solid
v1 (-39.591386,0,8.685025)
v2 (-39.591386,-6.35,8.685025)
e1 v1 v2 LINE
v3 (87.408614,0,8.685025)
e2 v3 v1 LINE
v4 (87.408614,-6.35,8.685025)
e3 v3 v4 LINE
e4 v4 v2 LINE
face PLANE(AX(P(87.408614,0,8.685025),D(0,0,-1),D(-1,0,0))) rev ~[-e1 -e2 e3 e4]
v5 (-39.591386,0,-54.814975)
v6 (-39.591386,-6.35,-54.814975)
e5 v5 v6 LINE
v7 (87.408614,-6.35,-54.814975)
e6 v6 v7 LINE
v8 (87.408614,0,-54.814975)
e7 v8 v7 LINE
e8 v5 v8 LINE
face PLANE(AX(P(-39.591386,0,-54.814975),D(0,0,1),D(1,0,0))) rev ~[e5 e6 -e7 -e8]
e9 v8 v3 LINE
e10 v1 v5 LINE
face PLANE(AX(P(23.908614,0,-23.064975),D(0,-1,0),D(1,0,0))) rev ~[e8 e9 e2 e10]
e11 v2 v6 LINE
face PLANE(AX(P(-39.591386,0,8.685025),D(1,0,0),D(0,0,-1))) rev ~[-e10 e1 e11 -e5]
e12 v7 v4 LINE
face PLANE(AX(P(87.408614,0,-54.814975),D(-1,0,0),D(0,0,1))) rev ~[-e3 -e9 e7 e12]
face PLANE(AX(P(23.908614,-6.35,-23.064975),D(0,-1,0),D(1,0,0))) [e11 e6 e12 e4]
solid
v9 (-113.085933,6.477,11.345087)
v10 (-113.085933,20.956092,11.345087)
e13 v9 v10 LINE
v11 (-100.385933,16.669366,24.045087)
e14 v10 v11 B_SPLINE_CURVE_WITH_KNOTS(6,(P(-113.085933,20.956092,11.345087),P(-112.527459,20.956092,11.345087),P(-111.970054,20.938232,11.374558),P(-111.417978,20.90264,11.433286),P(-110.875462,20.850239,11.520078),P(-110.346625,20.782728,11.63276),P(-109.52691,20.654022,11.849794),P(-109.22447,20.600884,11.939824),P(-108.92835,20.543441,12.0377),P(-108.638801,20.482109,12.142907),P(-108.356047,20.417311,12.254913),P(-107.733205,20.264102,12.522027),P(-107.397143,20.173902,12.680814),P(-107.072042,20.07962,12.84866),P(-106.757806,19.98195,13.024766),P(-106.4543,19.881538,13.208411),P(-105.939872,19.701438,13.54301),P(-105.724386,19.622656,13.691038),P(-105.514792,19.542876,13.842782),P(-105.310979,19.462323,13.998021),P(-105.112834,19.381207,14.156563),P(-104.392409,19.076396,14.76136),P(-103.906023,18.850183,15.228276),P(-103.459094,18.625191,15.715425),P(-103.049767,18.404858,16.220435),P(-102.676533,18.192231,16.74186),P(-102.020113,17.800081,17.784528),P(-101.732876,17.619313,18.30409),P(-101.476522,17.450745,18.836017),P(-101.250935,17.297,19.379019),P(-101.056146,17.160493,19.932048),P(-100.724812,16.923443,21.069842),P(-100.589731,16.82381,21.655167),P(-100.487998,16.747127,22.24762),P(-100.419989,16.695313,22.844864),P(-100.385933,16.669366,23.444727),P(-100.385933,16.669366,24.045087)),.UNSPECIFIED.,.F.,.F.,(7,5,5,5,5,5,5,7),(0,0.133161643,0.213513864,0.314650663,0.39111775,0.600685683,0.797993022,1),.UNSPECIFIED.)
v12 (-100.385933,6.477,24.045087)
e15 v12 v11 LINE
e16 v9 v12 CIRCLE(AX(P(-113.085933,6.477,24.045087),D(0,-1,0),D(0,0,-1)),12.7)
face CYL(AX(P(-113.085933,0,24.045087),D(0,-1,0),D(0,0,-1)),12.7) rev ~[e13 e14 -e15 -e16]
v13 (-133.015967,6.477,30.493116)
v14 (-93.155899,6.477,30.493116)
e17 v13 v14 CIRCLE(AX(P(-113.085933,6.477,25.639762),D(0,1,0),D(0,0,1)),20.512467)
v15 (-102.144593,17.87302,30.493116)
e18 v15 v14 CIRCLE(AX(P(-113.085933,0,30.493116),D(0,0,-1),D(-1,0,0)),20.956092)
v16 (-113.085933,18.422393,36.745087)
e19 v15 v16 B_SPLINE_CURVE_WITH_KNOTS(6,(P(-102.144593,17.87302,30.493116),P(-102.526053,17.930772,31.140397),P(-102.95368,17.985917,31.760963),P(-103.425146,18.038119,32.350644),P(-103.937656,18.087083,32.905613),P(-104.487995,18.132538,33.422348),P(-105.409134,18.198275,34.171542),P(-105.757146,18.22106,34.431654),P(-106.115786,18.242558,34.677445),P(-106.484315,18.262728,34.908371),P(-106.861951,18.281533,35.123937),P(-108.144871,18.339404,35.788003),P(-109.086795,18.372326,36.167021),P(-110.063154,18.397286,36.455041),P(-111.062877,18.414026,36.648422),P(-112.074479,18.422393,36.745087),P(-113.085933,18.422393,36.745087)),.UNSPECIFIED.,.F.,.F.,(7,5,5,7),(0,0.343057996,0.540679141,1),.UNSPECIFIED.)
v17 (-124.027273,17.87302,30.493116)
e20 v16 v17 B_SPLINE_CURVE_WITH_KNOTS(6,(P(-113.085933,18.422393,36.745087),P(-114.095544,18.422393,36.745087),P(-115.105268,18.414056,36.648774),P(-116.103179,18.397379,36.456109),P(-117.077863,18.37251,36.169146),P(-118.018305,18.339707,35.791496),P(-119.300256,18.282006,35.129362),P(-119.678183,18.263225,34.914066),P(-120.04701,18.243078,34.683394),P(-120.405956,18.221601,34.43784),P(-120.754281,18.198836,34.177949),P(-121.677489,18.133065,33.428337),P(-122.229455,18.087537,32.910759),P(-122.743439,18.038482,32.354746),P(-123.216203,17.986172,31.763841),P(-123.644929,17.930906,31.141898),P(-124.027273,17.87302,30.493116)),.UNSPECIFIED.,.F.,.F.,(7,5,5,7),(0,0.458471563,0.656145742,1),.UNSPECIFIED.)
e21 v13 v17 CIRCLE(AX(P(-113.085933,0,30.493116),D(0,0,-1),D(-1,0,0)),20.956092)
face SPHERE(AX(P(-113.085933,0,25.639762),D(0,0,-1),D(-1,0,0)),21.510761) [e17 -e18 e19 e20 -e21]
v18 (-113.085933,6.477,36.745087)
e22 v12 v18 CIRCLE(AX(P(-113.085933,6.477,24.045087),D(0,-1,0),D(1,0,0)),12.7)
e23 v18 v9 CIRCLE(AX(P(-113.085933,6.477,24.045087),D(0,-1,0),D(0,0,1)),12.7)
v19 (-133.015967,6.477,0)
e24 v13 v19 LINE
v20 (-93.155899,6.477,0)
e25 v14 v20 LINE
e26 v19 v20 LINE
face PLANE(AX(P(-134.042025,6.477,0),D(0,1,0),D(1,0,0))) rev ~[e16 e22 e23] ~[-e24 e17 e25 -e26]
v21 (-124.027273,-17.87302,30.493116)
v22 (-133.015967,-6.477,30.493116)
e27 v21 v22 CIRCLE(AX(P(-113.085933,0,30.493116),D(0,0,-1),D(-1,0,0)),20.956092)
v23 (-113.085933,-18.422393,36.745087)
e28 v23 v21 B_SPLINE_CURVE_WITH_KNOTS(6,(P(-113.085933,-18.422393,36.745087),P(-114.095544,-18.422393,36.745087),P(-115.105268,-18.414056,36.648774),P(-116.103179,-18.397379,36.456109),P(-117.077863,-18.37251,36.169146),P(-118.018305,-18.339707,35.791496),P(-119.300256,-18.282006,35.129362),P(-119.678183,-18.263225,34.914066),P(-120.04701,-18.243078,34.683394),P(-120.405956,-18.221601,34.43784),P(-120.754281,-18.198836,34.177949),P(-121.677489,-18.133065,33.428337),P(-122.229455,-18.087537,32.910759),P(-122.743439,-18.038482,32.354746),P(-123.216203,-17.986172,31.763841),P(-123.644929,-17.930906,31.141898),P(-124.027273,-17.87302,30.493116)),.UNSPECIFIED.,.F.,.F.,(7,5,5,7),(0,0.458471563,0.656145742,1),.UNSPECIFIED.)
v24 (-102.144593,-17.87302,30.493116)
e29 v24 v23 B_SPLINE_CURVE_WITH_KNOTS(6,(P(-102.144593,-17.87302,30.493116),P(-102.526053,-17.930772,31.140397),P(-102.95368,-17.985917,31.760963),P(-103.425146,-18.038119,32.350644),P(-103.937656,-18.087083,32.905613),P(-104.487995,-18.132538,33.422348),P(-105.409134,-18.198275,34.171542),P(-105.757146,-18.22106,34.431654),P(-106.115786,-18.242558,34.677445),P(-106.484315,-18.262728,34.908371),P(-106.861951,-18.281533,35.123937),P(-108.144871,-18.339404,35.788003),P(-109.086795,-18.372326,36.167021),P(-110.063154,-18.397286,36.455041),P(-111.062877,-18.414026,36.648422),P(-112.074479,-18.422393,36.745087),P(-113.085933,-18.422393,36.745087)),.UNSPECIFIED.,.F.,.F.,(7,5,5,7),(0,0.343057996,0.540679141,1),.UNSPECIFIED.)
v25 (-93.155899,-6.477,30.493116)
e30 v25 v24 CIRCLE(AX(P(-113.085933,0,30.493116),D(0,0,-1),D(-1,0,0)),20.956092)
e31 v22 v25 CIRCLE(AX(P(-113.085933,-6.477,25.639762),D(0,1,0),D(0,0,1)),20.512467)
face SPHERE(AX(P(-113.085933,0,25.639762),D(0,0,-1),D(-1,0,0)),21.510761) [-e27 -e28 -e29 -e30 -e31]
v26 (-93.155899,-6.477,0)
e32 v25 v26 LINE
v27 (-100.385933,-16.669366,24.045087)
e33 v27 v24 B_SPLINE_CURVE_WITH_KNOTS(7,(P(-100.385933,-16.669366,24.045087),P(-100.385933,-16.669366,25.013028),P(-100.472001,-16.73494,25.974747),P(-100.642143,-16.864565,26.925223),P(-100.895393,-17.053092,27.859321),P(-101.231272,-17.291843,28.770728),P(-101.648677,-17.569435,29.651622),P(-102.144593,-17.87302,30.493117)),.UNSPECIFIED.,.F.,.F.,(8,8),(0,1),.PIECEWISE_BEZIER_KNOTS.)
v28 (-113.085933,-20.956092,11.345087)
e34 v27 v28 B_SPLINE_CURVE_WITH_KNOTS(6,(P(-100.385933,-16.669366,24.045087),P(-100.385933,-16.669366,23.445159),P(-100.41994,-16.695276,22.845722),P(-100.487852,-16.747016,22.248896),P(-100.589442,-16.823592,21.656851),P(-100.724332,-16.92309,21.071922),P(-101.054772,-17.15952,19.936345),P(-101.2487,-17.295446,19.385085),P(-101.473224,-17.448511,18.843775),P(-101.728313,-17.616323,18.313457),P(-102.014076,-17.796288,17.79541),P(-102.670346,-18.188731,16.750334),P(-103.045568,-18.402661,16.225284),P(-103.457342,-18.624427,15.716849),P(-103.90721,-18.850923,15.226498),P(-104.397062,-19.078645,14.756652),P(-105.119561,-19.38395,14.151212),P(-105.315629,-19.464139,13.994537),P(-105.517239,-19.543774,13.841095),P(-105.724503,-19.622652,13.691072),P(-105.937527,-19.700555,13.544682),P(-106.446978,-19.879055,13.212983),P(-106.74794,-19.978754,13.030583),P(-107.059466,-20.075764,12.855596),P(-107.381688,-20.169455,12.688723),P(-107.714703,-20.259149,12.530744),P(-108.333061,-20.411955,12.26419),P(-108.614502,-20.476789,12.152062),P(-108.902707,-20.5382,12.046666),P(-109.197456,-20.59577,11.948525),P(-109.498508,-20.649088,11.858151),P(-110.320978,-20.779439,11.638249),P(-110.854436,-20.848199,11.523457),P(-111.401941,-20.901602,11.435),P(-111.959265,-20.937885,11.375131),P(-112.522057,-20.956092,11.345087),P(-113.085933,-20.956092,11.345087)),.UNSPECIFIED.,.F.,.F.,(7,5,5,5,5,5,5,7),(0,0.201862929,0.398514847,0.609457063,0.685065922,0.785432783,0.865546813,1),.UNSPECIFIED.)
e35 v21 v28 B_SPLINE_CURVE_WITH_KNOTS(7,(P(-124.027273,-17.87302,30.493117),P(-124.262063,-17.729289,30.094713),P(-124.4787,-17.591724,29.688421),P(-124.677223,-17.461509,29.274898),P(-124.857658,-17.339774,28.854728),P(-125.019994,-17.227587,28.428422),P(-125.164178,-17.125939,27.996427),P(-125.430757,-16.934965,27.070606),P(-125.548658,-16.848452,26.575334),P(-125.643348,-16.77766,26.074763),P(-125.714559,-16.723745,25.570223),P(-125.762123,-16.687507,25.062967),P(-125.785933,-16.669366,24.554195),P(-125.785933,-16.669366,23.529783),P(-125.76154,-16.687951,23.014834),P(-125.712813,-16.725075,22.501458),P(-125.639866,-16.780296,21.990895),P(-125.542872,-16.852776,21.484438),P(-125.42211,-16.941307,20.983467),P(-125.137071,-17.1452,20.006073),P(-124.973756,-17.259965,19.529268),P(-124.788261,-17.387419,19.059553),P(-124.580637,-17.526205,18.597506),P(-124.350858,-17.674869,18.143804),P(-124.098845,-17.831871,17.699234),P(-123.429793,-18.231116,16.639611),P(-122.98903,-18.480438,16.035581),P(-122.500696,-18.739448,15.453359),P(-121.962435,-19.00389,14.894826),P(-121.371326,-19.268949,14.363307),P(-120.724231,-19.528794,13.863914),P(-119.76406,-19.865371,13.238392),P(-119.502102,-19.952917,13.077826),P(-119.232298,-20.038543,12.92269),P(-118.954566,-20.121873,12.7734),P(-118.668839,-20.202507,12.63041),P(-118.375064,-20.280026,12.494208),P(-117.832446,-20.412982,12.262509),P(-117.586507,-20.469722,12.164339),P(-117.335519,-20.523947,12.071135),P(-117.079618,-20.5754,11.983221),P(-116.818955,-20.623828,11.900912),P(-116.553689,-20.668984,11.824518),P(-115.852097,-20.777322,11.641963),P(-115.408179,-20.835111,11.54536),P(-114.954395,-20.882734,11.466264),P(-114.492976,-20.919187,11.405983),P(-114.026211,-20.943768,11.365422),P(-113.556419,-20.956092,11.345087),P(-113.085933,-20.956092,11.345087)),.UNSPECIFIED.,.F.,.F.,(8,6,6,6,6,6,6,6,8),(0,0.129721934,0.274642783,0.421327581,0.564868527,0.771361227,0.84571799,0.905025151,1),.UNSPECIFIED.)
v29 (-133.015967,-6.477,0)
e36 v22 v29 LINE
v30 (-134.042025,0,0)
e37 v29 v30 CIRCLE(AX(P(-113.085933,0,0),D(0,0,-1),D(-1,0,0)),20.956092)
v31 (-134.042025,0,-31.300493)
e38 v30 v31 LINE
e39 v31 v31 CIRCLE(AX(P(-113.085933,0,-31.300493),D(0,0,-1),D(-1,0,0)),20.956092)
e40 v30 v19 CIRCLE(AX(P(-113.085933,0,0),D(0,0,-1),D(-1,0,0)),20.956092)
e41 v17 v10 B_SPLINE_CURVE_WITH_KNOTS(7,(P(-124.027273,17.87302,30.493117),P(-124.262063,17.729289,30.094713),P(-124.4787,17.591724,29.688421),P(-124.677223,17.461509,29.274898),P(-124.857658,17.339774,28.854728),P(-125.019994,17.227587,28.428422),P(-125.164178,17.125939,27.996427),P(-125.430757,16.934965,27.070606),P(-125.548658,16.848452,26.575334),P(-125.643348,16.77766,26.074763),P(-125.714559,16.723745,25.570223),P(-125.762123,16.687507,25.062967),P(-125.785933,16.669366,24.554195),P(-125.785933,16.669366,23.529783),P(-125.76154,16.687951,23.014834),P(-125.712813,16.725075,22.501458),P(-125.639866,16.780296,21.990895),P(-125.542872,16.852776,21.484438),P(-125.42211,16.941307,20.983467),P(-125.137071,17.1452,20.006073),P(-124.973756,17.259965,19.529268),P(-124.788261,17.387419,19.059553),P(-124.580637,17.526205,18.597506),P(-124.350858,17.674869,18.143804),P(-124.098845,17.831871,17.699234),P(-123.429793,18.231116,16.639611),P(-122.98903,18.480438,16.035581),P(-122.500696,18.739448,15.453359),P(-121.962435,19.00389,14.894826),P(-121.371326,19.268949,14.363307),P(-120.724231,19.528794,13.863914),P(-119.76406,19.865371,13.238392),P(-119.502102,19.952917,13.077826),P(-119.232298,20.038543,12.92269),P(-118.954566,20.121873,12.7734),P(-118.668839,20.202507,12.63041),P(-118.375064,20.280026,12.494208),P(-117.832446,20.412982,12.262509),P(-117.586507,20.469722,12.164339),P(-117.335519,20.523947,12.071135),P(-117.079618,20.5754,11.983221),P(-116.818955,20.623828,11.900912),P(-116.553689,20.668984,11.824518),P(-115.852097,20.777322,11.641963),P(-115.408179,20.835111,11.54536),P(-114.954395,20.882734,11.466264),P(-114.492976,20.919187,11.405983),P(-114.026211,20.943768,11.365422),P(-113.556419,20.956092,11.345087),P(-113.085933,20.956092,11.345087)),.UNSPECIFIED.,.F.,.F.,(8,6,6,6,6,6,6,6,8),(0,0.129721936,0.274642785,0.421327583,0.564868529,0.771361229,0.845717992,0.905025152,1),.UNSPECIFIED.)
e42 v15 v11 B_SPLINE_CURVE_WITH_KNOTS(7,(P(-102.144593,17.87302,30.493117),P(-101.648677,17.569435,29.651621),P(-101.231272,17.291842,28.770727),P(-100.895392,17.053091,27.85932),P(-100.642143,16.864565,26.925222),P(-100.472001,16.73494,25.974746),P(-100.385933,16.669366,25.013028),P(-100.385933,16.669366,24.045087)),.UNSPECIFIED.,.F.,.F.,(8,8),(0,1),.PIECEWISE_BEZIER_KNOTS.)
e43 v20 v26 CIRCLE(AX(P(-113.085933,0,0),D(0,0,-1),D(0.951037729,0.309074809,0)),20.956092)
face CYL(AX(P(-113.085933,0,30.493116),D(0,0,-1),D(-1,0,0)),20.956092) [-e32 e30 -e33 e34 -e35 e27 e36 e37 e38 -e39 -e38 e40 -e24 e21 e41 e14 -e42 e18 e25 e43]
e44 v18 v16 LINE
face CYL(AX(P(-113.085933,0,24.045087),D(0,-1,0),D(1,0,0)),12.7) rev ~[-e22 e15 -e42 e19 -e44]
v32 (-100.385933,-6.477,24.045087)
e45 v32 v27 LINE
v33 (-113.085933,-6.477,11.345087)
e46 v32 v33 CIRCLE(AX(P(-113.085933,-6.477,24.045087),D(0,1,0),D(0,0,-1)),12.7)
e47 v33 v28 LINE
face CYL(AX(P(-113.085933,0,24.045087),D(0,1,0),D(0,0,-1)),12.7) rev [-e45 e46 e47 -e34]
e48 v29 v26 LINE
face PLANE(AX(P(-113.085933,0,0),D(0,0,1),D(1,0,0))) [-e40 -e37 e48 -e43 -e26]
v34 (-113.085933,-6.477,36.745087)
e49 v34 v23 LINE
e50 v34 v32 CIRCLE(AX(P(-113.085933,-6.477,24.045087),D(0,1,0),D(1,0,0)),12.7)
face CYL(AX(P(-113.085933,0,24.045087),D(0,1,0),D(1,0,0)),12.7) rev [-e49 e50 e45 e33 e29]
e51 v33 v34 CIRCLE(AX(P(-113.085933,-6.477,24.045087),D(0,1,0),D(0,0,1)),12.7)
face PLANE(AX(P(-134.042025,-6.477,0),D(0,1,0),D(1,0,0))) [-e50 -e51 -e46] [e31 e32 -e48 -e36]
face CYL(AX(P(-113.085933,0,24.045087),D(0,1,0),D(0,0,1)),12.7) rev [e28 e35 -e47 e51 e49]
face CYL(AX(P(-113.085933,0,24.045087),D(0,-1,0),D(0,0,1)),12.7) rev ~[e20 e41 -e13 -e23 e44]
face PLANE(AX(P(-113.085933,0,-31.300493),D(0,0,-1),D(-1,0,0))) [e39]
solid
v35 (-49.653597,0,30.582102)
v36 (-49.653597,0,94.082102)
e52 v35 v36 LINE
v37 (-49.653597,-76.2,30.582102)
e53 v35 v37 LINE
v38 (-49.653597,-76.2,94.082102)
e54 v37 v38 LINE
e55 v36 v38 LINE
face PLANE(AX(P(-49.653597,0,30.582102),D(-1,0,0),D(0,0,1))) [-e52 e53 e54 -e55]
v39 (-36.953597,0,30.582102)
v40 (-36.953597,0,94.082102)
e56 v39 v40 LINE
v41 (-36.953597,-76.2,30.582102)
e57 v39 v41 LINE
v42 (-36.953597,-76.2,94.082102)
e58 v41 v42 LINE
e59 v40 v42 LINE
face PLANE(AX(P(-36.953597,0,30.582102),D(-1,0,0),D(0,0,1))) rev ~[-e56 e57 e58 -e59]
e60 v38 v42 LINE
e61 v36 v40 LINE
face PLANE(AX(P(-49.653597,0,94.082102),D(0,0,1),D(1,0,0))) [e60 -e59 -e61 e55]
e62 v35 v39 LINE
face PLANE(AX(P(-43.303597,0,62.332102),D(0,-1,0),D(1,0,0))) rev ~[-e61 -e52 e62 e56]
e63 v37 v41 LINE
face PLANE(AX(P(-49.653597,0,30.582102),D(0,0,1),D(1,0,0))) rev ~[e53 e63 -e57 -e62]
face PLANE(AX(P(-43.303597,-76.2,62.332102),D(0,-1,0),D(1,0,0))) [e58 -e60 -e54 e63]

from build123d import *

# Parameters (mm, degrees)
F1_DEPTH = 6.35
F0_W     = 12.7
F0_H     = 63.5
F2_DEPTH = 76.2
F4_DEPTH = 20.9570915828
F5_DEPTH = 25.4
F6_W     = 41.9121831656
F6_H     = 12.954
F7_DEPTH = 78.4056


# Not quite as in the source:
# - a feature names something its author has since deleted; it is built from what else it names


with BuildPart() as f1:
    # F0 (on Front) → F1 (new body)
    with BuildSketch(Plane.XZ):
        Polygon((-32.8281914331, 8.6850252382), (-39.5913863666, 8.6850252382), (-39.5913863666, -54.8149747618), (-32.8281914331, -54.8149747618), (17.9718085669, -54.8149747618), (87.4086136334, -54.8149747618), (87.4086136334, 8.6850252382), (17.9718085669, 8.6850252382), align=None)
    extrude(amount=F1_DEPTH)


with BuildPart() as f2:
    # F0 (on Front) → F2 (new body)
    with BuildSketch(Plane.XZ):
        with Locations((-43.3035971761, 62.3321020156)):
            Rectangle(F0_W, F0_H)
    extrude(amount=F2_DEPTH)


with BuildPart() as f3:
    # F0 (on Front) → F3 (revolve)
    with BuildSketch(Plane.XZ):
        with BuildLine():
            ThreePointArc((-113.0859330297, 11.3450873971), (-125.7859330297, 24.0450873971), (-113.0859330297, 36.7450873971))
            Line((-113.0859330297, 36.7450873971), (-113.0859330297, 47.1505224705))
            ThreePointArc((-113.0859330297, 47.1505224705), (-126.4708775994, 42.47888537), (-134.0420246124, 30.4931160063))
            Line((-134.0420246124, 30.4931160063), (-134.0420246124, -31.3004925847))
            Line((-134.0420246124, -31.3004925847), (-113.0859330297, -31.3004925847))
            Line((-113.0859330297, -31.3004925847), (-113.0859330297, 11.3450873971))
        make_face()
        with BuildLine():
            ThreePointArc((-113.0859330297, 11.3450873971), (-104.1056769086, 15.064831276), (-100.3859330297, 24.0450873971))
            ThreePointArc((-100.3859330297, 24.0450873971), (-104.1056769086, 33.0253435182), (-113.0859330297, 36.7450873971))
            ThreePointArc((-113.0859330297, 36.7450873971), (-125.7859330297, 24.0450873971), (-113.0859330297, 11.3450873971))
        make_face()
    revolve(axis=Axis((-113.0859330297, 0, -9.9777025938), (0, 0, -1)))

    # F0 (on Front) → F4 (cut, through all)
    with BuildSketch(Plane.XZ):
        with BuildLine():
            ThreePointArc((-113.0859330297, 11.3450873971), (-104.1056769086, 15.064831276), (-100.3859330297, 24.0450873971))
            ThreePointArc((-100.3859330297, 24.0450873971), (-104.1056769086, 33.0253435182), (-113.0859330297, 36.7450873971))
            ThreePointArc((-113.0859330297, 36.7450873971), (-125.7859330297, 24.0450873971), (-113.0859330297, 11.3450873971))
        make_face()
    extrude(amount=-F4_DEPTH, mode=Mode.SUBTRACT)

    # F0 (on Front) → F5 (cut)
    with BuildSketch(Plane.XZ):
        with BuildLine():
            ThreePointArc((-113.0859330297, 11.3450873971), (-104.1056769086, 15.064831276), (-100.3859330297, 24.0450873971))
            ThreePointArc((-100.3859330297, 24.0450873971), (-104.1056769086, 33.0253435182), (-113.0859330297, 36.7450873971))
            ThreePointArc((-113.0859330297, 36.7450873971), (-125.7859330297, 24.0450873971), (-113.0859330297, 11.3450873971))
        make_face()
    extrude(amount=F5_DEPTH, mode=Mode.SUBTRACT)

    # F6 (on Top) → F7 (cut)
    with BuildSketch(Plane.XY):
        with Locations((-113.0859330297, 0)):
            Rectangle(F6_W, F6_H)
    extrude(amount=F7_DEPTH, mode=Mode.SUBTRACT)


solid = Compound([f1.part, f2.part, f3.part])
